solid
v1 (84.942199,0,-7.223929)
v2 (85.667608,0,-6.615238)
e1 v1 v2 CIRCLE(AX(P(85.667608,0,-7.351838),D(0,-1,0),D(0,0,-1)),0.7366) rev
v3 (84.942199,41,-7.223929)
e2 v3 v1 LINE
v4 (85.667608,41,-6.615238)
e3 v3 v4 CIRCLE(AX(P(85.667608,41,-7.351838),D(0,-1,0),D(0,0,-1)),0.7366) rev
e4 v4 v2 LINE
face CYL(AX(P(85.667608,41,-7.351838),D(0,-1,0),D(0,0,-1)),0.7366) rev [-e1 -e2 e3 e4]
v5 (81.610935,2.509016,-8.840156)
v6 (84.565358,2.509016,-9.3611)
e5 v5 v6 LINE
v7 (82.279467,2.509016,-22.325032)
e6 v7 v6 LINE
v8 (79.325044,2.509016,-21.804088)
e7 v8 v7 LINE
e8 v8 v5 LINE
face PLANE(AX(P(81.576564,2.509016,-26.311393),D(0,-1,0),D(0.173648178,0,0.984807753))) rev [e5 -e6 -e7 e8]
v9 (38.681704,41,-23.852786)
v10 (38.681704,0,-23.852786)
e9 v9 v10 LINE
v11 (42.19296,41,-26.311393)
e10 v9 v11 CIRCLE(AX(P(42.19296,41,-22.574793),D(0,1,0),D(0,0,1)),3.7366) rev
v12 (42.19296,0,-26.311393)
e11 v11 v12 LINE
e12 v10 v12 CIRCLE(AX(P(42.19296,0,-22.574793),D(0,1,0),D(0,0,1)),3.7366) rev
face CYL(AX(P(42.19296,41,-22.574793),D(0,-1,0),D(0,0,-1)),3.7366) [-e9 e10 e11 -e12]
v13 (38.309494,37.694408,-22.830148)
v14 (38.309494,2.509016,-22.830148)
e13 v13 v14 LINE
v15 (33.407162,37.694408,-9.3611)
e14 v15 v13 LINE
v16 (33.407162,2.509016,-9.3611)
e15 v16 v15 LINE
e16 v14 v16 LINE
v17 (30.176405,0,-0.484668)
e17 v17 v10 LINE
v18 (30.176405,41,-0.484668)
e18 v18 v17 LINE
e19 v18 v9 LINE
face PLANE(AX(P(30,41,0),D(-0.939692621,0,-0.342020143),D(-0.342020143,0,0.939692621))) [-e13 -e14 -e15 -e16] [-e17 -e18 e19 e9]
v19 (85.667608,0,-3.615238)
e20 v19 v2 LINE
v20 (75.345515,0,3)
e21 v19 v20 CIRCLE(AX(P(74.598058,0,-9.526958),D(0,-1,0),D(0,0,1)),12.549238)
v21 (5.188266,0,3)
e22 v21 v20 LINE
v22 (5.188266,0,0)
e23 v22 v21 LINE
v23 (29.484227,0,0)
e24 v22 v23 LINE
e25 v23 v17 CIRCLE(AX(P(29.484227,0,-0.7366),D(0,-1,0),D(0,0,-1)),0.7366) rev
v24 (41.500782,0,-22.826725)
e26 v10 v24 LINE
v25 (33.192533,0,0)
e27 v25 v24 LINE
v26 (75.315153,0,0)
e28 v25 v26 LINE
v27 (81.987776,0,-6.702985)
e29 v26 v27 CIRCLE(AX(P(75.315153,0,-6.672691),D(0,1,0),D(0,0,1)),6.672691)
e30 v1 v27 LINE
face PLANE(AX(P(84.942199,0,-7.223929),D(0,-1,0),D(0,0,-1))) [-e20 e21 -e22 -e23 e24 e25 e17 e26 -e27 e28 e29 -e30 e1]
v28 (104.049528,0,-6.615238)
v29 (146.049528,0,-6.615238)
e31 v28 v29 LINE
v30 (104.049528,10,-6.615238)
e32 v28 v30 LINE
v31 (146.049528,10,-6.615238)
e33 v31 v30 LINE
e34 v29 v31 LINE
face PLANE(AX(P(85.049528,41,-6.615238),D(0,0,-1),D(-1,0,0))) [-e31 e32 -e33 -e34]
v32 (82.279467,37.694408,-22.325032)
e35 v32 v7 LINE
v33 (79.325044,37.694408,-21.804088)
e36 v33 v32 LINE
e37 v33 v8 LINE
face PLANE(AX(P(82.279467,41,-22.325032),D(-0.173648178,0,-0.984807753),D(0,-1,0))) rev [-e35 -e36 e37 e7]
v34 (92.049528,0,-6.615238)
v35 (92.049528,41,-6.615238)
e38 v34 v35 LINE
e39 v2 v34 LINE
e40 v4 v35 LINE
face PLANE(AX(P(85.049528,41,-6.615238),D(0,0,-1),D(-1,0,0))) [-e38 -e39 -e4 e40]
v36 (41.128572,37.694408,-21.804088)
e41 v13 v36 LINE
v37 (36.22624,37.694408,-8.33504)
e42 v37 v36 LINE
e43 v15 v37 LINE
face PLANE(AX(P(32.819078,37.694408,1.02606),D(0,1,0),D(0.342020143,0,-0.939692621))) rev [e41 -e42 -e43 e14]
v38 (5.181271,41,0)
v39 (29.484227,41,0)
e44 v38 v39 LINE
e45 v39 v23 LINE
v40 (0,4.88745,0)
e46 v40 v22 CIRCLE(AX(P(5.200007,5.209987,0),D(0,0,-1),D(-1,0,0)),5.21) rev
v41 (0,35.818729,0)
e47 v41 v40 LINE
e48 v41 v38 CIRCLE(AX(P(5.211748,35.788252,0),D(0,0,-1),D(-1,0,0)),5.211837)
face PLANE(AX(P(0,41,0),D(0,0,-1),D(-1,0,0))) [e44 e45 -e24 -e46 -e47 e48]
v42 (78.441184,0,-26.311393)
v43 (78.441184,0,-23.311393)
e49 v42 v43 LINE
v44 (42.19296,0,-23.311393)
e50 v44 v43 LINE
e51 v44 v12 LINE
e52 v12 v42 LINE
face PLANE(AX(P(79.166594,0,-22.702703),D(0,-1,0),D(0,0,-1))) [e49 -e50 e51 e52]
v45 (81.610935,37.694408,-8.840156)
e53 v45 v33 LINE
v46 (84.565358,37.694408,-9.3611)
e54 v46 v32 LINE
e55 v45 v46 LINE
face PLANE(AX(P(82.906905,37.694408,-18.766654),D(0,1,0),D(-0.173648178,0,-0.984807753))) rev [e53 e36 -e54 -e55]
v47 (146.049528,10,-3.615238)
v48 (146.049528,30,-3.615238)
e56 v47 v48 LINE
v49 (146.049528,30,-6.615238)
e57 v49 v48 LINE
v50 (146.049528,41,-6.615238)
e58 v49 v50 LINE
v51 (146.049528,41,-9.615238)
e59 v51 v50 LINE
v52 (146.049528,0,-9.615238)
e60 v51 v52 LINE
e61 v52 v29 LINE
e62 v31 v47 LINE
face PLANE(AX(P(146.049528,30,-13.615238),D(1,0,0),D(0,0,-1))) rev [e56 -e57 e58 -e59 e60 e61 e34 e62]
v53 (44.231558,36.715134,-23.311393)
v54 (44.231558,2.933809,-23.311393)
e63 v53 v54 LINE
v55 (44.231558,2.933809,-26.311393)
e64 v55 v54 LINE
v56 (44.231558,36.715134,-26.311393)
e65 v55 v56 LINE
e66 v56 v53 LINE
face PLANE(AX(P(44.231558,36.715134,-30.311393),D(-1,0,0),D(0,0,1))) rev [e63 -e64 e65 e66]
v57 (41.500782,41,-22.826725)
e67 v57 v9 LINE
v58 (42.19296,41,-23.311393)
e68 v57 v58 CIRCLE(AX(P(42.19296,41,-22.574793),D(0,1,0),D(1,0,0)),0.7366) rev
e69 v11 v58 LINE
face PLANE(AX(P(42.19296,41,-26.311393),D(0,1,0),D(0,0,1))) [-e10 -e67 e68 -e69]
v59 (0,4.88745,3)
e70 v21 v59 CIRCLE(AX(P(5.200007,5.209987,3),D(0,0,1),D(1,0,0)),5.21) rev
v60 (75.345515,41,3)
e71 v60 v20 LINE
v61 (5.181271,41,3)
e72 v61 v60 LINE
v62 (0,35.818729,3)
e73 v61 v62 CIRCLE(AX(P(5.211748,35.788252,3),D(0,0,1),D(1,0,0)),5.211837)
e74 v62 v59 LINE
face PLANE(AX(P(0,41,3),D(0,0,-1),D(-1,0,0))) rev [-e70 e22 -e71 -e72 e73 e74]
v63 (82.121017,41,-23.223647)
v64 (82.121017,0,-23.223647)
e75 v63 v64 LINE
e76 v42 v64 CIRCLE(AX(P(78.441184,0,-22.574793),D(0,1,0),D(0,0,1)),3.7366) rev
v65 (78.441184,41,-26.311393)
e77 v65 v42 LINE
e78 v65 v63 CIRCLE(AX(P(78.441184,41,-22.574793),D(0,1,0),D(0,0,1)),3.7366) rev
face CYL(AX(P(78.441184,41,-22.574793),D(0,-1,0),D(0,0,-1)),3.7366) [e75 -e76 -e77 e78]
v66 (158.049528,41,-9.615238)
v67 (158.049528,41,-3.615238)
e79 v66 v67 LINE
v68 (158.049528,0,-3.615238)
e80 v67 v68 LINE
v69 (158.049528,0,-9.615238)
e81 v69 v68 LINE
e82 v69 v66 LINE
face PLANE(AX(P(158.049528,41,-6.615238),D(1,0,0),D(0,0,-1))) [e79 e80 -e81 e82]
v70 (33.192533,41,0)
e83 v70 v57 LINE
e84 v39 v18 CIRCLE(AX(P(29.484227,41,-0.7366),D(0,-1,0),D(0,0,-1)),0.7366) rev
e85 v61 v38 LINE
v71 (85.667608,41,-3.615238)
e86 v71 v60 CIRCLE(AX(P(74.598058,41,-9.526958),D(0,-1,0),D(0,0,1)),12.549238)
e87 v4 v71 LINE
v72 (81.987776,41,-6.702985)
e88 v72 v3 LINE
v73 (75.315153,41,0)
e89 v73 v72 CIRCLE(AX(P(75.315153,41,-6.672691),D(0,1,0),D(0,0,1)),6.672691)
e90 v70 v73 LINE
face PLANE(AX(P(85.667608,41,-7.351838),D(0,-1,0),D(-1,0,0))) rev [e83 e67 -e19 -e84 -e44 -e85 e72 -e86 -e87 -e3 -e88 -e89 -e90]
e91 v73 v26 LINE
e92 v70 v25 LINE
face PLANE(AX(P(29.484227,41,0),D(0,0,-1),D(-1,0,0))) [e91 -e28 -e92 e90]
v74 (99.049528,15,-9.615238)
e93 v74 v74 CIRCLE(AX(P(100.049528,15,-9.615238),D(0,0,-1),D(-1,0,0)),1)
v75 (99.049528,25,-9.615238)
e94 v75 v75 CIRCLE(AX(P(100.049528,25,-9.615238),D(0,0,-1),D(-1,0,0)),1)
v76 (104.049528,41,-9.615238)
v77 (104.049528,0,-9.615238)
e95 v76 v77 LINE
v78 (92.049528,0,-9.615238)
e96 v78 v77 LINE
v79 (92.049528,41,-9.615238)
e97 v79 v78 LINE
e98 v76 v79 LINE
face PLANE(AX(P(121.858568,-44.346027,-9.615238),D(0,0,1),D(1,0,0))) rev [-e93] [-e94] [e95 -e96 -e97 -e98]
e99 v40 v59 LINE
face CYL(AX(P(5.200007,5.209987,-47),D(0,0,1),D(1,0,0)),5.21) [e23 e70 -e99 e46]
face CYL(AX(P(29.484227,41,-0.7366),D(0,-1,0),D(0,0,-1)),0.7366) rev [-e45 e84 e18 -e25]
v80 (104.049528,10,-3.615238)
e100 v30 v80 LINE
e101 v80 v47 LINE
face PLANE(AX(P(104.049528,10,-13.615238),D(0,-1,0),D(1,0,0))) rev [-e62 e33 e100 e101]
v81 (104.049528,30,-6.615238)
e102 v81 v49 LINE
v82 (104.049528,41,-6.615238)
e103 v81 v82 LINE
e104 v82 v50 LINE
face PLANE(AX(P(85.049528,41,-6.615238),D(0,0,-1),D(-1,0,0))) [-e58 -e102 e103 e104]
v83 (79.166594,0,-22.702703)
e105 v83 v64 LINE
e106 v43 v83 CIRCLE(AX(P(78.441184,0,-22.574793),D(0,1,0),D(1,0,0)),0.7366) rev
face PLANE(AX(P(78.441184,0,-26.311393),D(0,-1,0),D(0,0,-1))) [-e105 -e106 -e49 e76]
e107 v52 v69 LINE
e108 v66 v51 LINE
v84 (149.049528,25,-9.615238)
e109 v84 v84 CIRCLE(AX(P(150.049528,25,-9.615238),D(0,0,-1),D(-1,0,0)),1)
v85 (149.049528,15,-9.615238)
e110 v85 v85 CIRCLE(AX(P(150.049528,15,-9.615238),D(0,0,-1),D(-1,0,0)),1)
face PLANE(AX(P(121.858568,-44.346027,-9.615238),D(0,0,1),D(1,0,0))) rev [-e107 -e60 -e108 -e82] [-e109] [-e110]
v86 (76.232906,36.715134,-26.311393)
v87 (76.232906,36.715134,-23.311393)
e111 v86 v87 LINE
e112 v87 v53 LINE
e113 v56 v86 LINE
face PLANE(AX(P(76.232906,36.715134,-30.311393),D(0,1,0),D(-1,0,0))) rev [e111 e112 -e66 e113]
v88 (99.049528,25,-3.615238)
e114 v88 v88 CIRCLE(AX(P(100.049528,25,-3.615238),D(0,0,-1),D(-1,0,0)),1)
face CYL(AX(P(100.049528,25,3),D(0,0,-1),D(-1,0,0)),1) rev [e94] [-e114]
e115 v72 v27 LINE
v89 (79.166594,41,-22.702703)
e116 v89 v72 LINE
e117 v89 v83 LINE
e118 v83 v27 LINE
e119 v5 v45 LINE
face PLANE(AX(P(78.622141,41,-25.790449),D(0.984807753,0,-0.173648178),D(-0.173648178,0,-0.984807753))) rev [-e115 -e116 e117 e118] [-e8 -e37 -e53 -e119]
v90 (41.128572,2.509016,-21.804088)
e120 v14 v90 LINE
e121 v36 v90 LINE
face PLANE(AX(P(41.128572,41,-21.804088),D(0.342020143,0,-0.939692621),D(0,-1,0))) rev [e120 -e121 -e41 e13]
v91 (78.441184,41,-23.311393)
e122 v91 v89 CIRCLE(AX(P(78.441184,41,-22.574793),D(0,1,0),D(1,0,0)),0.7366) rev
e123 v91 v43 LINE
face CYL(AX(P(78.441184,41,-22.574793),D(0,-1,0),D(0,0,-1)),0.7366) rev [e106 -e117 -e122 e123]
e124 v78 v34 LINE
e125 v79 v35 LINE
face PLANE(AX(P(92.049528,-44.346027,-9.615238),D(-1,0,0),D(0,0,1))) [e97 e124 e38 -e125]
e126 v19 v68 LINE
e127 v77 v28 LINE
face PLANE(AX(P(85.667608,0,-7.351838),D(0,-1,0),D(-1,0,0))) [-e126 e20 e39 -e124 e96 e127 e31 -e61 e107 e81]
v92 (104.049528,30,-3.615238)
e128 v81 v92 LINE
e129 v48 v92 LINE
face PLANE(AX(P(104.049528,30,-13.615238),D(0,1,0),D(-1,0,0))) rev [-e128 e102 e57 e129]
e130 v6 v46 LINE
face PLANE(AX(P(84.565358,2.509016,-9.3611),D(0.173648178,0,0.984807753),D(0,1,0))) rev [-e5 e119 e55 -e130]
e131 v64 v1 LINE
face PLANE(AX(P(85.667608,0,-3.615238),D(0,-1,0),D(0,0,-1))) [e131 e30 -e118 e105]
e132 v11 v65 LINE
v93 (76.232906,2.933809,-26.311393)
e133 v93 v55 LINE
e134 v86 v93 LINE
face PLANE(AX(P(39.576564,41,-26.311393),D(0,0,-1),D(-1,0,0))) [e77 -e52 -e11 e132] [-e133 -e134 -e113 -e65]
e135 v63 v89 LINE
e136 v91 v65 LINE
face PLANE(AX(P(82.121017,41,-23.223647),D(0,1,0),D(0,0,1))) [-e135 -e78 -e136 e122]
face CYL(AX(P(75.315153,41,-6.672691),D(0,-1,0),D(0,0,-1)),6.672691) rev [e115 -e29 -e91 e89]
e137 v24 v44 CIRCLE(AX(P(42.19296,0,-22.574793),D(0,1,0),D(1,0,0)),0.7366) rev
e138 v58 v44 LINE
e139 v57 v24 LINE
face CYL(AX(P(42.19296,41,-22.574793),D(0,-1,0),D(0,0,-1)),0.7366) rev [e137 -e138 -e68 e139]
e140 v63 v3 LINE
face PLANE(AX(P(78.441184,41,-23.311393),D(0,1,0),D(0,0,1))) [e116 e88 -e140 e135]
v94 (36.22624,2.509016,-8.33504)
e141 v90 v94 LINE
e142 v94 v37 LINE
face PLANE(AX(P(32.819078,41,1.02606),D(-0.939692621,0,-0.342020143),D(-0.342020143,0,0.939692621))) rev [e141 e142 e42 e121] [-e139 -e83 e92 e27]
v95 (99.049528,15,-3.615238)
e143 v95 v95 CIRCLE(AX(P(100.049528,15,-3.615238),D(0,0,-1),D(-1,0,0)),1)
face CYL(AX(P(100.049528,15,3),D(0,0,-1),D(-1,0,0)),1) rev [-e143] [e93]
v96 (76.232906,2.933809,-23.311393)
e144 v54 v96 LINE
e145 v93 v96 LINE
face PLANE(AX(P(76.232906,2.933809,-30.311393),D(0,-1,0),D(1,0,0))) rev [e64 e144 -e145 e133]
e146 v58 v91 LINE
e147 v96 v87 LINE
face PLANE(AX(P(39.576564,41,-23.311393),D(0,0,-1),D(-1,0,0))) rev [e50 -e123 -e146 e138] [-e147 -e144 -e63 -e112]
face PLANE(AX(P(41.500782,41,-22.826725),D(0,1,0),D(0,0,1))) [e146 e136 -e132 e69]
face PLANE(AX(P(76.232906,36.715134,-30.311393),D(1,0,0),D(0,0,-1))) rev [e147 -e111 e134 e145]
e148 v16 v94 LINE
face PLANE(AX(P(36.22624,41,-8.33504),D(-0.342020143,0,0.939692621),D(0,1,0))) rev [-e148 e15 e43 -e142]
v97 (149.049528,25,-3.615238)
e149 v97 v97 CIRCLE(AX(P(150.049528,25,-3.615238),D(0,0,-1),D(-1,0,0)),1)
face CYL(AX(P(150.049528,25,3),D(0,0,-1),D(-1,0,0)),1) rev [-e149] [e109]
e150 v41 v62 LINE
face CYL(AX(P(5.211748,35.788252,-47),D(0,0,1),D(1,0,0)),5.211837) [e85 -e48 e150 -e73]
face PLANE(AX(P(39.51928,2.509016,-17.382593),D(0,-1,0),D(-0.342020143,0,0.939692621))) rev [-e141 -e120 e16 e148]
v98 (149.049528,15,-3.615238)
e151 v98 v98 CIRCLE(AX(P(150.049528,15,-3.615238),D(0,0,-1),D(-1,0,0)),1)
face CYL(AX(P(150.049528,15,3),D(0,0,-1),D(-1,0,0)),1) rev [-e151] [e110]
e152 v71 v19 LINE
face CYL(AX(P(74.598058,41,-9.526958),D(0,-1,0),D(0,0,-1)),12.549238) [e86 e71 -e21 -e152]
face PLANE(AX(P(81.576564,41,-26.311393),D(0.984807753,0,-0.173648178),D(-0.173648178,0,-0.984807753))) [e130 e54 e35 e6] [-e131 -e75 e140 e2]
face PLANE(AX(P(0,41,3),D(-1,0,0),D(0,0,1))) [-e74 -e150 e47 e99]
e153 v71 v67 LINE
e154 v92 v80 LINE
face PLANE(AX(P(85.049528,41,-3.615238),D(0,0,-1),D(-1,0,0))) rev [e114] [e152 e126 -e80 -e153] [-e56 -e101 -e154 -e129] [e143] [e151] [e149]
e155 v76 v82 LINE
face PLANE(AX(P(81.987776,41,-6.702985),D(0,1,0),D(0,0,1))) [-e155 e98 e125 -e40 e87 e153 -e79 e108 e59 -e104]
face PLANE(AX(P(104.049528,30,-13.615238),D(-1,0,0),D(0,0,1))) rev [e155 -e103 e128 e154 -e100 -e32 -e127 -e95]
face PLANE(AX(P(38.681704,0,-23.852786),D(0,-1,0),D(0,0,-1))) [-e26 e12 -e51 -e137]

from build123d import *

# Parameters (mm, degrees)
BASE_FLANGE1_DEPTH  = 41
SKETCH2_W           = 42
SKETCH2_H           = 20
CUT_EXTRUDE1_DEPTH  = 10
BOSS_EXTRUDE1_DEPTH = 6
SKETCH5_R           = 1
CUT_EXTRUDE3_DEPTH  = 165.132308696
BOSS_EXTRUDE2_DEPTH = 41
SKETCH7_W           = 32.001348433
SKETCH7_H           = 33.78132576
CUT_EXTRUDE4_DEPTH  = 7
CUT_EXTRUDE5_START  = 2.509016302
CUT_EXTRUDE5_DEPTH  = 35.18539121
CUT_EXTRUDE6_START  = -3
CUT_EXTRUDE6_DEPTH  = 3


# Read off the part's stored shape, not the designer's step: Cut-Extrude5, Cut-Extrude6
# Sheet-metal steps are written as plain solids
with BuildPart() as part:
    # Sketch1 → Base-Flange1 (new body)
    with BuildSketch(Plane(origin=(0, 0, 0), x_dir=(1, 0, 0), z_dir=(0, 1, 0))):
        with BuildLine():
            Line((0, 0), (29.484227127, 0))
            ThreePointArc((29.484227127, 0), (29.90672353, 0.133212604), (30.176404712, 0.484667962))
            Line((30.176404712, 0.484667962), (38.681704054, 23.85278585))
            ThreePointArc((38.681704054, 23.85278585), (40.049733788, 25.635636911), (42.1929595, 26.311393382))
            Line((42.1929595, 26.311393382), (78.441184331, 26.311393382))
            ThreePointArc((78.441184331, 26.311393382), (80.843024514, 25.437195048), (82.121016981, 23.223647163))
            Line((82.121016981, 23.223647163), (84.942198964, 7.223929074))
            ThreePointArc((84.942198964, 7.223929074), (85.194131001, 6.787569985), (85.667608355, 6.615238322))
            Line((85.667608355, 6.615238322), (158.049527566, 6.615238322))
            Line((158.049527566, 6.615238322), (158.049527566, 3.615238322))
            Line((158.049527566, 3.615238322), (85.667608355, 3.615238322))
            ThreePointArc((85.667608355, 3.615238322), (83.265768172, 4.489436656), (81.987775705, 6.702984541))
            Line((81.987775705, 6.702984541), (79.166593722, 22.70270263))
            ThreePointArc((79.166593722, 22.70270263), (78.914661685, 23.139061719), (78.441184331, 23.311393382))
            Line((78.441184331, 23.311393382), (42.1929595, 23.311393382))
            ThreePointArc((42.1929595, 23.311393382), (41.770463097, 23.178180778), (41.500781916, 22.82672542))
            Line((41.500781916, 22.82672542), (32.995482574, -0.541392468))
            ThreePointArc((32.995482574, -0.541392468), (31.627452839, -2.324243529), (29.484227127, -3))
            Line((29.484227127, -3), (0, -3))
            Line((0, -3), (0, 0))
        make_face()
    extrude(amount=BASE_FLANGE1_DEPTH)

    # Sketch2 → Cut-Extrude1 (cut)
    with BuildSketch(Plane.XY.offset(-3.615238322)):
        with Locations((125.049527566, 20)):
            Rectangle(SKETCH2_W, SKETCH2_H)
    extrude(amount=-CUT_EXTRUDE1_DEPTH, mode=Mode.SUBTRACT)

    # Sketch3 → Boss-Extrude1 (add)
    with BuildSketch(Plane.XY.offset(-3.615238322)):
        Polygon((104.049527566, 30), (104.049527566, 41), (92.049527566, 41), (92.049527566, 0), (104.049527566, 0), (104.049527566, 10), align=None)
        Polygon((158.049527566, 0), (158.049527566, 41), (146.049527566, 41), (146.049527566, 30), (146.049527566, 10), (146.049527566, 0), align=None)
    extrude(amount=-BOSS_EXTRUDE1_DEPTH)

    # Sketch5 → Cut-Extrude3 (cut, through all)
    with BuildSketch(Plane(origin=(0, 0, -9.615238322), x_dir=(-1, 0, 0), z_dir=(0, 0, -1))):
        with Locations((-100.049527566, 25)):
            Circle(SKETCH5_R)
        with Locations((-100.049527566, 15)):
            Circle(SKETCH5_R)
        with Locations((-150.049527566, 15)):
            Circle(SKETCH5_R)
        with Locations((-150.049527566, 25)):
            Circle(SKETCH5_R)
    extrude(amount=-CUT_EXTRUDE3_DEPTH, mode=Mode.SUBTRACT)

    # Sketch6 → Boss-Extrude2 (add)
    with BuildSketch(Plane(origin=(0, 0, 0), x_dir=(-1, 0, 0), z_dir=(0, -1, 0))):
        with BuildLine():
            Line((-29.484227127, -3), (-75.34551542, -3))
            ThreePointArc((-75.34551542, -3), (-81.36937718, -1.03867544), (-85.667608355, 3.615238322))
            ThreePointArc((-85.667608355, 3.615238322), (-83.265768172, 4.489436656), (-81.987775705, 6.702984541))
            ThreePointArc((-81.987775705, 6.702984541), (-80.044156462, 1.965108483), (-75.315152978, 0))
            Line((-75.315152978, 0), (-29.484227127, 0))
            Line((-29.484227127, 0), (-29.484227127, -3))
        make_face()
    extrude(amount=-BOSS_EXTRUDE2_DEPTH)

    # Sketch7 → Cut-Extrude4 (cut)
    with BuildSketch(Plane.XY.offset(-23.311393382)):
        with Locations((60.232231791, 19.824471405)):
            Rectangle(SKETCH7_W, SKETCH7_H)
    extrude(amount=-CUT_EXTRUDE4_DEPTH, mode=Mode.SUBTRACT)

    # Cut-Extrude5 outline → Cut-Extrude5 (cut)
    with BuildSketch(Plane(origin=(0, 0, 0), x_dir=(1, 0, 0), z_dir=(0, 1, 0)).offset(CUT_EXTRUDE5_START)):
        Polygon((84.565358052, 9.361100086), (82.279466997, 22.325032469), (79.325043738, 21.804087936), (81.610934793, 8.840155553), align=None)
        Polygon((38.309494449, 22.830148366), (33.407161792, 9.361100086), (36.226239654, 8.335039656), (41.128572311, 21.804087936), align=None)
    extrude(amount=CUT_EXTRUDE5_DEPTH, mode=Mode.SUBTRACT)

    # Cut-Extrude6 outline → Cut-Extrude6 (cut)
    with BuildSketch(Plane.XY.offset(3).offset(CUT_EXTRUDE6_START)):
        with BuildLine():
            ThreePointArc((5.188265578, 0), (1.627560559, 1.417661865), (0, 4.887450335))
            Line((0, 4.887450335), (0, 0))
            Line((0, 0), (5.188265578, 0))
        make_face()
        with BuildLine():
            ThreePointArc((0, 35.818729295), (1.526422616, 39.473577384), (5.181270705, 41))
            Line((5.181270705, 41), (0, 41))
            Line((0, 41), (0, 35.818729295))
        make_face()
    extrude(amount=CUT_EXTRUDE6_DEPTH, mode=Mode.SUBTRACT)


solid = part.part
